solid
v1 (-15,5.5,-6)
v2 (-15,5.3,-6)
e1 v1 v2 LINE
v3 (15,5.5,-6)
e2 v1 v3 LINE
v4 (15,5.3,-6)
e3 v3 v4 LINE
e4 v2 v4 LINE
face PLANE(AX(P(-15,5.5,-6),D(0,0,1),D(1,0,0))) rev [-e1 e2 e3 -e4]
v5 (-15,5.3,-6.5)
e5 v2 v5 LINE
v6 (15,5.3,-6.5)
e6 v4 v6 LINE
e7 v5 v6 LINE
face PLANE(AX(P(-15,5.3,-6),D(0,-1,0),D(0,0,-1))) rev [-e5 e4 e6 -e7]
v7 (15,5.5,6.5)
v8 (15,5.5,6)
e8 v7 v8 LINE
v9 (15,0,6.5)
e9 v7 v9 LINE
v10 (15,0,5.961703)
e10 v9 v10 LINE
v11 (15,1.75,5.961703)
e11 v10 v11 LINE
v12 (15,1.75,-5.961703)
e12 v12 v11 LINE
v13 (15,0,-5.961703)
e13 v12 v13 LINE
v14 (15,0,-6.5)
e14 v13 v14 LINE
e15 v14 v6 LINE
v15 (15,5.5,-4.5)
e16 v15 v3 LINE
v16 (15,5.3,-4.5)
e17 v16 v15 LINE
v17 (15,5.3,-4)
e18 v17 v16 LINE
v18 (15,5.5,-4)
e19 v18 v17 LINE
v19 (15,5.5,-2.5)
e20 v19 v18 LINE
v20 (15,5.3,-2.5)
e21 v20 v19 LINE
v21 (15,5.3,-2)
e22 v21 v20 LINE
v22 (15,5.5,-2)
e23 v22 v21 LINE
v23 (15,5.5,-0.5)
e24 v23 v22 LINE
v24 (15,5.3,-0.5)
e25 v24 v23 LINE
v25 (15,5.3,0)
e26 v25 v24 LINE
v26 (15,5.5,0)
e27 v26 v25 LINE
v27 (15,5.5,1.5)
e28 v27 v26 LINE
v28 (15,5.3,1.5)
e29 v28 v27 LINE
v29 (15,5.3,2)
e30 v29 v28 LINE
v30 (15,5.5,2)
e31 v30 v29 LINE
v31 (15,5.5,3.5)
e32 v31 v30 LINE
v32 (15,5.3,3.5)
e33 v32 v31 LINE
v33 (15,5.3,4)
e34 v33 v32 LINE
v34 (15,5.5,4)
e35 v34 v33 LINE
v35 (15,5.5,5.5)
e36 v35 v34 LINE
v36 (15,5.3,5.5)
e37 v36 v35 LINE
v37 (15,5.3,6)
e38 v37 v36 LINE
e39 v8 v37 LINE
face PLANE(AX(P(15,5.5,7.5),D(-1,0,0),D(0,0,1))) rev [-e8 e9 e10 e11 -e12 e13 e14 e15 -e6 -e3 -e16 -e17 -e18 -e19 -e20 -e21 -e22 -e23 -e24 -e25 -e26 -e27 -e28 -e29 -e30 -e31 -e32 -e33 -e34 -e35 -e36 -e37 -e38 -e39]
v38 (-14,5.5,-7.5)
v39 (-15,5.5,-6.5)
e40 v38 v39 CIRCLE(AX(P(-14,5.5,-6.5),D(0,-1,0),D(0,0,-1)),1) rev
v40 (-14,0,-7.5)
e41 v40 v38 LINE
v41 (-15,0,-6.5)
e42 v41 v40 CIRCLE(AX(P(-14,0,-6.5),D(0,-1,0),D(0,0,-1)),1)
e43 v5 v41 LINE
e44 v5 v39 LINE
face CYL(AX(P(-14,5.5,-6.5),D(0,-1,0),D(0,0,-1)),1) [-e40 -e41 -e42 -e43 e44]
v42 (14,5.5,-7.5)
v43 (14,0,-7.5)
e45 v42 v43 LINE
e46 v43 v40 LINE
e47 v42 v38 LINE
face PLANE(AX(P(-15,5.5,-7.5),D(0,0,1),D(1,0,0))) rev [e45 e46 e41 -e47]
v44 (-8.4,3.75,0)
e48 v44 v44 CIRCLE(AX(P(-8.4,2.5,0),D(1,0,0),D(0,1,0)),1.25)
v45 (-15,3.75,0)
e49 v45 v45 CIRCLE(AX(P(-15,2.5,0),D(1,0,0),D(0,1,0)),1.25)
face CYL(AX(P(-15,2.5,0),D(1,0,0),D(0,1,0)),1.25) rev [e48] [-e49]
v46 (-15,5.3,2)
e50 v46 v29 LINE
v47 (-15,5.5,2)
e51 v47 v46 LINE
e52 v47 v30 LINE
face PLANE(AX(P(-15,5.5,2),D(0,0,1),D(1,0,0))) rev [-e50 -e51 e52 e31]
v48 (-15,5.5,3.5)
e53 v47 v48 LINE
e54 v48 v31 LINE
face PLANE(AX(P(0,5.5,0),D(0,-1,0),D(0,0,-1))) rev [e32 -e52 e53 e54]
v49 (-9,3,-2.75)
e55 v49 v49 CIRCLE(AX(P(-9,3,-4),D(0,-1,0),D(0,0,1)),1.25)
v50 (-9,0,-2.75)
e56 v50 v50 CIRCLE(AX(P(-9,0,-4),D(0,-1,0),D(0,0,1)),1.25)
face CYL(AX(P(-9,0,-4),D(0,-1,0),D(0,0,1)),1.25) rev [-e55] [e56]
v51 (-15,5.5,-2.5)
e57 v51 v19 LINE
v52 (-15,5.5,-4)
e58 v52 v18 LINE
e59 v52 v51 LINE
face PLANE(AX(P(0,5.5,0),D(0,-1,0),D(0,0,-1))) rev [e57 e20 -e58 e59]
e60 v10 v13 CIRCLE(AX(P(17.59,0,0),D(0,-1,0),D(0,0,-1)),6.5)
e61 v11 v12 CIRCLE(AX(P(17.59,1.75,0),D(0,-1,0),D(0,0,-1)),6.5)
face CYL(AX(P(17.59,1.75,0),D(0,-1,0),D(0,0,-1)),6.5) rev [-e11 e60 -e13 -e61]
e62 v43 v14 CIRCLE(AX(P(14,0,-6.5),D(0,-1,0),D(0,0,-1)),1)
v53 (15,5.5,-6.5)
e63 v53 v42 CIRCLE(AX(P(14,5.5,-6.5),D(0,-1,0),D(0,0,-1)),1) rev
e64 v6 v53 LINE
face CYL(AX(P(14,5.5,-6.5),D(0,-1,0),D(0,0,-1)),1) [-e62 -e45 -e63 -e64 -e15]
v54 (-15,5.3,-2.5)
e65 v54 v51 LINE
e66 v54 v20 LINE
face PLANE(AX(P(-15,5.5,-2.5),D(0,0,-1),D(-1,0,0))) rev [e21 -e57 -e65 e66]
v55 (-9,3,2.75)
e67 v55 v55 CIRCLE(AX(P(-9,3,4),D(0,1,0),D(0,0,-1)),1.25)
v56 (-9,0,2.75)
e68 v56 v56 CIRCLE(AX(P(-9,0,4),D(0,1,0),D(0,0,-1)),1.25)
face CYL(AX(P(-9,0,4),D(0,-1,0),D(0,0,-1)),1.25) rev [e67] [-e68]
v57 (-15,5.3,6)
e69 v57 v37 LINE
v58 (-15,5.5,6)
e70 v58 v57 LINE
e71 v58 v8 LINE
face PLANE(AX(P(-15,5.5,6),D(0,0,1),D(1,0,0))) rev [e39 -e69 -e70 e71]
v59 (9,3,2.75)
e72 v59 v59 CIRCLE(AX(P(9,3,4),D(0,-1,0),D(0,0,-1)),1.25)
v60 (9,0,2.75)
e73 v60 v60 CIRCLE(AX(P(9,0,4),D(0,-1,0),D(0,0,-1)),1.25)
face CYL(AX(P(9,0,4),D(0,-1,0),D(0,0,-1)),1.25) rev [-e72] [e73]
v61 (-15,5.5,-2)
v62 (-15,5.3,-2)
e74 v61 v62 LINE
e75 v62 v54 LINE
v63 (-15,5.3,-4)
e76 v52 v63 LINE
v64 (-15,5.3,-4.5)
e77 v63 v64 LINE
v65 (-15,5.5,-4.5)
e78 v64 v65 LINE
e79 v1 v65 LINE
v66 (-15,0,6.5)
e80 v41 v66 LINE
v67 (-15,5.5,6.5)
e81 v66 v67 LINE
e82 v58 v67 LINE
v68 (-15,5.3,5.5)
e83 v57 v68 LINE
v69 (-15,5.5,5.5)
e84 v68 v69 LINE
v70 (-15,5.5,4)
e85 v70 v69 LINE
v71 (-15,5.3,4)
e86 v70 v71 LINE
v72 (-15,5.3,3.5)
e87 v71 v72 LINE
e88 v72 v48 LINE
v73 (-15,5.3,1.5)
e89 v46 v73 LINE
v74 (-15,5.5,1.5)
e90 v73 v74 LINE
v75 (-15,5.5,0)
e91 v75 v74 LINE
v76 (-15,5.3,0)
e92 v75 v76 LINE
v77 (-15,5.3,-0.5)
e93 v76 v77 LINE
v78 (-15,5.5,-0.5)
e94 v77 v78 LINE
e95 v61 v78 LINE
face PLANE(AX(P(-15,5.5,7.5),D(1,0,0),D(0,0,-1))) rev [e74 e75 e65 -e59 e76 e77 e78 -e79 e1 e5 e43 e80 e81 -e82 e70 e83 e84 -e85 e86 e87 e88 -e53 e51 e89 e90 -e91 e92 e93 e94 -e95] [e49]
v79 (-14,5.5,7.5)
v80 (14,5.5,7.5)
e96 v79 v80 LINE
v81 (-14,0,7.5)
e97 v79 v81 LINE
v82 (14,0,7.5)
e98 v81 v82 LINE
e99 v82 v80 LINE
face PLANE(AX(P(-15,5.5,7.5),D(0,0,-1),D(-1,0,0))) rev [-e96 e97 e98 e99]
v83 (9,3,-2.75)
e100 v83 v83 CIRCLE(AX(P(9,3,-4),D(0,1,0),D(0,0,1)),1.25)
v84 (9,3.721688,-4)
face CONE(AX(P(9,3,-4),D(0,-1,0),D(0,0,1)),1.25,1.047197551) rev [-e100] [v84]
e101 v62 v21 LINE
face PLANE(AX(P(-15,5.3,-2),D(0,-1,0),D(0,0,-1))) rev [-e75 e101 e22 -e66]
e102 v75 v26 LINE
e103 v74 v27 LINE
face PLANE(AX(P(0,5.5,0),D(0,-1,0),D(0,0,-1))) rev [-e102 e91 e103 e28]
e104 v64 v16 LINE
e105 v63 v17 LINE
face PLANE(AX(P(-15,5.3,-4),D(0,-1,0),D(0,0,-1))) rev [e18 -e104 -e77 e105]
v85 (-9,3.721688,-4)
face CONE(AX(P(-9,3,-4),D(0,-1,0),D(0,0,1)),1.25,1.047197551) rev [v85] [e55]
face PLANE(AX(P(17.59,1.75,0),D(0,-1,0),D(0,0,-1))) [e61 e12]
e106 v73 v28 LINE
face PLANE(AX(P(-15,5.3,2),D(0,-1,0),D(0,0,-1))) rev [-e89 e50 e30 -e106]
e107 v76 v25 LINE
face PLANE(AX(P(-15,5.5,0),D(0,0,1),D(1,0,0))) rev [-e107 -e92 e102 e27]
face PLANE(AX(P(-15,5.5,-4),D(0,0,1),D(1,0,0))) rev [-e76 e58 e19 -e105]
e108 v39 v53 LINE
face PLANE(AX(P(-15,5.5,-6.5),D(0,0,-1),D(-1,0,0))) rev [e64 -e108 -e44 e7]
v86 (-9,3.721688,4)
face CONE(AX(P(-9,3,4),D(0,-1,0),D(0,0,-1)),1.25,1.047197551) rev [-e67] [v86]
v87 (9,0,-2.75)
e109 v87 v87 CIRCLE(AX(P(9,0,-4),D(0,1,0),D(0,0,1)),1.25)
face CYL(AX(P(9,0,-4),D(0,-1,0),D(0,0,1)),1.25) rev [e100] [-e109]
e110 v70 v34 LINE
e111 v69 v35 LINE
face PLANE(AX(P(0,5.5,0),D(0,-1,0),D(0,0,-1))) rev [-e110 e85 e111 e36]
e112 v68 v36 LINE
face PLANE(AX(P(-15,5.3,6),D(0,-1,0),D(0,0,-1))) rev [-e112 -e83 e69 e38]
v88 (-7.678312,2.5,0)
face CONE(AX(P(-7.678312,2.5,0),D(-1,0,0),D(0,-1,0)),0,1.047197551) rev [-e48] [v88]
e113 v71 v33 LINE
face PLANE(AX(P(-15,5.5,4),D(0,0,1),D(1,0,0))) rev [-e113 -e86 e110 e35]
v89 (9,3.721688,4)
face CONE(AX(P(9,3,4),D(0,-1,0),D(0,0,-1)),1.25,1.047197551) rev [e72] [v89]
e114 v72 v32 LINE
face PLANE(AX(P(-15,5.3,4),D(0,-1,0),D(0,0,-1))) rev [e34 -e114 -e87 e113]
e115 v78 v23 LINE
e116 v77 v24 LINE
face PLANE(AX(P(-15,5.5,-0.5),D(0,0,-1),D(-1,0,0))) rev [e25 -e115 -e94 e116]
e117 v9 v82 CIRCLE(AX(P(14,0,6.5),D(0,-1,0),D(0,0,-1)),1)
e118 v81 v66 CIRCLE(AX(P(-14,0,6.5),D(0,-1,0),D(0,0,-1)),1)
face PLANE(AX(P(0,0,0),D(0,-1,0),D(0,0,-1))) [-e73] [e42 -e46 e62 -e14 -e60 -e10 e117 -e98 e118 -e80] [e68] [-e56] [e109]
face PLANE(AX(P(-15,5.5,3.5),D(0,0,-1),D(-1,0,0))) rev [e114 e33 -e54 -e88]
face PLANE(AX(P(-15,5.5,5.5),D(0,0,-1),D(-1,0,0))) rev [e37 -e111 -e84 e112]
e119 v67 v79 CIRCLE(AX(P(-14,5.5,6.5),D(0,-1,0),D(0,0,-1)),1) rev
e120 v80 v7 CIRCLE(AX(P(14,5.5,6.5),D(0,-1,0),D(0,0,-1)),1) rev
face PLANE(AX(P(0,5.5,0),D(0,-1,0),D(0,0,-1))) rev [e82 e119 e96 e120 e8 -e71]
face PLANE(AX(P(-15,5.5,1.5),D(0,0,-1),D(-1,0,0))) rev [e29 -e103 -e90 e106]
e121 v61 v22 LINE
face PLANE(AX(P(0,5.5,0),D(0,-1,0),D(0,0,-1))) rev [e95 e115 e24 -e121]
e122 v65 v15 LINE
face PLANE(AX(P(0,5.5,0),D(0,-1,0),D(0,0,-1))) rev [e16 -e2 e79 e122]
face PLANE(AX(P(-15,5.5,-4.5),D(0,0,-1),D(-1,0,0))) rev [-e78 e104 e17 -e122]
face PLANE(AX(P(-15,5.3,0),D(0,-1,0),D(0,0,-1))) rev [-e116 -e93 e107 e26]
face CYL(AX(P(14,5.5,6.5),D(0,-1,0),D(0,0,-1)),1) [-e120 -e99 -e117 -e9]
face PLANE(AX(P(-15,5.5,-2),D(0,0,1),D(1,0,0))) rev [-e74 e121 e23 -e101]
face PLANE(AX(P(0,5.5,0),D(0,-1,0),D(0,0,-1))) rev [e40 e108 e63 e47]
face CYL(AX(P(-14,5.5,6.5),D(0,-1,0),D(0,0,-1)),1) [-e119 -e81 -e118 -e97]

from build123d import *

# Parameters (mm, degrees)
SKETCH1_W               = 30
SKETCH1_H               = 15
BOSS_EXTRUDE1_DEPTH     = 5.5
CUT_EXTRUDE2_DEPTH      = 18.649362595
CUT_EXTRUDE2_DEPTH_BACK = 18.649362595
SKETCH2_W               = 0.5
SKETCH2_H               = 0.2
SKETCH7_R               = 6.5
CUT_EXTRUDE6_DEPTH      = 1.75
FILLET1_R               = 1


with BuildPart() as part:
    # Sketch1 → Boss-Extrude1 (new body)
    with BuildSketch(Plane(origin=(0, 0, 0), x_dir=(1, 0, 0), z_dir=(0, 1, 0))):
        Rectangle(SKETCH1_W, SKETCH1_H)
    extrude(amount=BOSS_EXTRUDE1_DEPTH)

    # Sketch2 → Cut-Extrude2 (cut, two sides: drawn at the far end of the back side and taken through both)
    with BuildSketch(Plane(origin=(0, 0, 0), x_dir=(0, 0, -1), z_dir=(1, 0, 0)).offset(-CUT_EXTRUDE2_DEPTH_BACK)):
        with Locations((-5.75, 5.4)):
            Rectangle(SKETCH2_W, SKETCH2_H)
        with Locations((-3.75, 5.4)):
            Rectangle(SKETCH2_W, SKETCH2_H)
        with Locations((-1.75, 5.4)):
            Rectangle(SKETCH2_W, SKETCH2_H)
        with Locations((0.25, 5.4)):
            Rectangle(SKETCH2_W, SKETCH2_H)
        with Locations((2.25, 5.4)):
            Rectangle(SKETCH2_W, SKETCH2_H)
        with Locations((4.25, 5.4)):
            Rectangle(SKETCH2_W, SKETCH2_H)
        with Locations((6.25, 5.4)):
            Rectangle(SKETCH2_W, SKETCH2_H)
    extrude(amount=CUT_EXTRUDE2_DEPTH + CUT_EXTRUDE2_DEPTH_BACK, mode=Mode.SUBTRACT)

    # Sketch8 → Cut-Revolve1 (revolve, cut)
    with BuildSketch(Plane.XY.offset(4), mode=Mode.PRIVATE) as cut_revolve1_sk:
        Polygon((10.25, 0), (10.25, 3), (9, 3.721687836), (9, 0), align=None)
    cut_revolve1 = revolve(cut_revolve1_sk.sketch.rotate(Axis((9, 0, 4), (0, 1, 0)), 90), axis=Axis((9, 0, 4), (0, 1, 0)), mode=Mode.SUBTRACT)

    # Mirror1: Cut-Revolve1 across plane
    add(cut_revolve1.mirror(Plane.XY), mode=Mode.SUBTRACT)

    # Mirror2: Cut-Revolve1 across plane
    add(cut_revolve1.mirror(Plane(origin=(0, 0, 0), x_dir=(0, 0, 1), z_dir=(1, 0, 0))), mode=Mode.SUBTRACT)

    # Mirror2 copy 1 sketch → Mirror2 copy 1 (revolve, cut)
    with BuildSketch(Plane(origin=(0, 0, -4), x_dir=(-1, 0, 0), z_dir=(0, 0, -1))):
        Polygon((10.25, 0), (10.25, 3), (9, 3.721687836), (9, 0), align=None)
    revolve(axis=Axis((-9, 0, -4), (0, 1, 0)), mode=Mode.SUBTRACT)

    # Sketch9 → Cut-Revolve2 (revolve, cut)
    with BuildSketch(Plane.XY, mode=Mode.PRIVATE) as cut_revolve2_sk:
        Polygon((-15, 2.5), (-7.678312164, 2.5), (-8.4, 3.75), (-15, 3.75), align=None)
    revolve(cut_revolve2_sk.sketch.rotate(Axis((-15, 2.5, 0), (-1, 0, 0)), 180), axis=Axis((-15, 2.5, 0), (-1, 0, 0)), mode=Mode.SUBTRACT)

    # Sketch7 → Cut-Extrude6 (cut)
    with BuildSketch(Plane.XZ):
        with Locations((17.59, 0)):
            Circle(SKETCH7_R)
    extrude(amount=-CUT_EXTRUDE6_DEPTH, mode=Mode.SUBTRACT)

    # Fillet1
    fillet1_edges = [part.edges().sort_by_distance(p)[0] for p in [
        (-15, 2.75, -7.5),
        (15, 2.75, -7.5),
        (15, 2.75, 7.5),
        (-15, 2.75, 7.5),
    ]]
    fillet(fillet1_edges, radius=FILLET1_R - 0.0001)  # a hair under: the kernel refuses the full size


solid = part.part
